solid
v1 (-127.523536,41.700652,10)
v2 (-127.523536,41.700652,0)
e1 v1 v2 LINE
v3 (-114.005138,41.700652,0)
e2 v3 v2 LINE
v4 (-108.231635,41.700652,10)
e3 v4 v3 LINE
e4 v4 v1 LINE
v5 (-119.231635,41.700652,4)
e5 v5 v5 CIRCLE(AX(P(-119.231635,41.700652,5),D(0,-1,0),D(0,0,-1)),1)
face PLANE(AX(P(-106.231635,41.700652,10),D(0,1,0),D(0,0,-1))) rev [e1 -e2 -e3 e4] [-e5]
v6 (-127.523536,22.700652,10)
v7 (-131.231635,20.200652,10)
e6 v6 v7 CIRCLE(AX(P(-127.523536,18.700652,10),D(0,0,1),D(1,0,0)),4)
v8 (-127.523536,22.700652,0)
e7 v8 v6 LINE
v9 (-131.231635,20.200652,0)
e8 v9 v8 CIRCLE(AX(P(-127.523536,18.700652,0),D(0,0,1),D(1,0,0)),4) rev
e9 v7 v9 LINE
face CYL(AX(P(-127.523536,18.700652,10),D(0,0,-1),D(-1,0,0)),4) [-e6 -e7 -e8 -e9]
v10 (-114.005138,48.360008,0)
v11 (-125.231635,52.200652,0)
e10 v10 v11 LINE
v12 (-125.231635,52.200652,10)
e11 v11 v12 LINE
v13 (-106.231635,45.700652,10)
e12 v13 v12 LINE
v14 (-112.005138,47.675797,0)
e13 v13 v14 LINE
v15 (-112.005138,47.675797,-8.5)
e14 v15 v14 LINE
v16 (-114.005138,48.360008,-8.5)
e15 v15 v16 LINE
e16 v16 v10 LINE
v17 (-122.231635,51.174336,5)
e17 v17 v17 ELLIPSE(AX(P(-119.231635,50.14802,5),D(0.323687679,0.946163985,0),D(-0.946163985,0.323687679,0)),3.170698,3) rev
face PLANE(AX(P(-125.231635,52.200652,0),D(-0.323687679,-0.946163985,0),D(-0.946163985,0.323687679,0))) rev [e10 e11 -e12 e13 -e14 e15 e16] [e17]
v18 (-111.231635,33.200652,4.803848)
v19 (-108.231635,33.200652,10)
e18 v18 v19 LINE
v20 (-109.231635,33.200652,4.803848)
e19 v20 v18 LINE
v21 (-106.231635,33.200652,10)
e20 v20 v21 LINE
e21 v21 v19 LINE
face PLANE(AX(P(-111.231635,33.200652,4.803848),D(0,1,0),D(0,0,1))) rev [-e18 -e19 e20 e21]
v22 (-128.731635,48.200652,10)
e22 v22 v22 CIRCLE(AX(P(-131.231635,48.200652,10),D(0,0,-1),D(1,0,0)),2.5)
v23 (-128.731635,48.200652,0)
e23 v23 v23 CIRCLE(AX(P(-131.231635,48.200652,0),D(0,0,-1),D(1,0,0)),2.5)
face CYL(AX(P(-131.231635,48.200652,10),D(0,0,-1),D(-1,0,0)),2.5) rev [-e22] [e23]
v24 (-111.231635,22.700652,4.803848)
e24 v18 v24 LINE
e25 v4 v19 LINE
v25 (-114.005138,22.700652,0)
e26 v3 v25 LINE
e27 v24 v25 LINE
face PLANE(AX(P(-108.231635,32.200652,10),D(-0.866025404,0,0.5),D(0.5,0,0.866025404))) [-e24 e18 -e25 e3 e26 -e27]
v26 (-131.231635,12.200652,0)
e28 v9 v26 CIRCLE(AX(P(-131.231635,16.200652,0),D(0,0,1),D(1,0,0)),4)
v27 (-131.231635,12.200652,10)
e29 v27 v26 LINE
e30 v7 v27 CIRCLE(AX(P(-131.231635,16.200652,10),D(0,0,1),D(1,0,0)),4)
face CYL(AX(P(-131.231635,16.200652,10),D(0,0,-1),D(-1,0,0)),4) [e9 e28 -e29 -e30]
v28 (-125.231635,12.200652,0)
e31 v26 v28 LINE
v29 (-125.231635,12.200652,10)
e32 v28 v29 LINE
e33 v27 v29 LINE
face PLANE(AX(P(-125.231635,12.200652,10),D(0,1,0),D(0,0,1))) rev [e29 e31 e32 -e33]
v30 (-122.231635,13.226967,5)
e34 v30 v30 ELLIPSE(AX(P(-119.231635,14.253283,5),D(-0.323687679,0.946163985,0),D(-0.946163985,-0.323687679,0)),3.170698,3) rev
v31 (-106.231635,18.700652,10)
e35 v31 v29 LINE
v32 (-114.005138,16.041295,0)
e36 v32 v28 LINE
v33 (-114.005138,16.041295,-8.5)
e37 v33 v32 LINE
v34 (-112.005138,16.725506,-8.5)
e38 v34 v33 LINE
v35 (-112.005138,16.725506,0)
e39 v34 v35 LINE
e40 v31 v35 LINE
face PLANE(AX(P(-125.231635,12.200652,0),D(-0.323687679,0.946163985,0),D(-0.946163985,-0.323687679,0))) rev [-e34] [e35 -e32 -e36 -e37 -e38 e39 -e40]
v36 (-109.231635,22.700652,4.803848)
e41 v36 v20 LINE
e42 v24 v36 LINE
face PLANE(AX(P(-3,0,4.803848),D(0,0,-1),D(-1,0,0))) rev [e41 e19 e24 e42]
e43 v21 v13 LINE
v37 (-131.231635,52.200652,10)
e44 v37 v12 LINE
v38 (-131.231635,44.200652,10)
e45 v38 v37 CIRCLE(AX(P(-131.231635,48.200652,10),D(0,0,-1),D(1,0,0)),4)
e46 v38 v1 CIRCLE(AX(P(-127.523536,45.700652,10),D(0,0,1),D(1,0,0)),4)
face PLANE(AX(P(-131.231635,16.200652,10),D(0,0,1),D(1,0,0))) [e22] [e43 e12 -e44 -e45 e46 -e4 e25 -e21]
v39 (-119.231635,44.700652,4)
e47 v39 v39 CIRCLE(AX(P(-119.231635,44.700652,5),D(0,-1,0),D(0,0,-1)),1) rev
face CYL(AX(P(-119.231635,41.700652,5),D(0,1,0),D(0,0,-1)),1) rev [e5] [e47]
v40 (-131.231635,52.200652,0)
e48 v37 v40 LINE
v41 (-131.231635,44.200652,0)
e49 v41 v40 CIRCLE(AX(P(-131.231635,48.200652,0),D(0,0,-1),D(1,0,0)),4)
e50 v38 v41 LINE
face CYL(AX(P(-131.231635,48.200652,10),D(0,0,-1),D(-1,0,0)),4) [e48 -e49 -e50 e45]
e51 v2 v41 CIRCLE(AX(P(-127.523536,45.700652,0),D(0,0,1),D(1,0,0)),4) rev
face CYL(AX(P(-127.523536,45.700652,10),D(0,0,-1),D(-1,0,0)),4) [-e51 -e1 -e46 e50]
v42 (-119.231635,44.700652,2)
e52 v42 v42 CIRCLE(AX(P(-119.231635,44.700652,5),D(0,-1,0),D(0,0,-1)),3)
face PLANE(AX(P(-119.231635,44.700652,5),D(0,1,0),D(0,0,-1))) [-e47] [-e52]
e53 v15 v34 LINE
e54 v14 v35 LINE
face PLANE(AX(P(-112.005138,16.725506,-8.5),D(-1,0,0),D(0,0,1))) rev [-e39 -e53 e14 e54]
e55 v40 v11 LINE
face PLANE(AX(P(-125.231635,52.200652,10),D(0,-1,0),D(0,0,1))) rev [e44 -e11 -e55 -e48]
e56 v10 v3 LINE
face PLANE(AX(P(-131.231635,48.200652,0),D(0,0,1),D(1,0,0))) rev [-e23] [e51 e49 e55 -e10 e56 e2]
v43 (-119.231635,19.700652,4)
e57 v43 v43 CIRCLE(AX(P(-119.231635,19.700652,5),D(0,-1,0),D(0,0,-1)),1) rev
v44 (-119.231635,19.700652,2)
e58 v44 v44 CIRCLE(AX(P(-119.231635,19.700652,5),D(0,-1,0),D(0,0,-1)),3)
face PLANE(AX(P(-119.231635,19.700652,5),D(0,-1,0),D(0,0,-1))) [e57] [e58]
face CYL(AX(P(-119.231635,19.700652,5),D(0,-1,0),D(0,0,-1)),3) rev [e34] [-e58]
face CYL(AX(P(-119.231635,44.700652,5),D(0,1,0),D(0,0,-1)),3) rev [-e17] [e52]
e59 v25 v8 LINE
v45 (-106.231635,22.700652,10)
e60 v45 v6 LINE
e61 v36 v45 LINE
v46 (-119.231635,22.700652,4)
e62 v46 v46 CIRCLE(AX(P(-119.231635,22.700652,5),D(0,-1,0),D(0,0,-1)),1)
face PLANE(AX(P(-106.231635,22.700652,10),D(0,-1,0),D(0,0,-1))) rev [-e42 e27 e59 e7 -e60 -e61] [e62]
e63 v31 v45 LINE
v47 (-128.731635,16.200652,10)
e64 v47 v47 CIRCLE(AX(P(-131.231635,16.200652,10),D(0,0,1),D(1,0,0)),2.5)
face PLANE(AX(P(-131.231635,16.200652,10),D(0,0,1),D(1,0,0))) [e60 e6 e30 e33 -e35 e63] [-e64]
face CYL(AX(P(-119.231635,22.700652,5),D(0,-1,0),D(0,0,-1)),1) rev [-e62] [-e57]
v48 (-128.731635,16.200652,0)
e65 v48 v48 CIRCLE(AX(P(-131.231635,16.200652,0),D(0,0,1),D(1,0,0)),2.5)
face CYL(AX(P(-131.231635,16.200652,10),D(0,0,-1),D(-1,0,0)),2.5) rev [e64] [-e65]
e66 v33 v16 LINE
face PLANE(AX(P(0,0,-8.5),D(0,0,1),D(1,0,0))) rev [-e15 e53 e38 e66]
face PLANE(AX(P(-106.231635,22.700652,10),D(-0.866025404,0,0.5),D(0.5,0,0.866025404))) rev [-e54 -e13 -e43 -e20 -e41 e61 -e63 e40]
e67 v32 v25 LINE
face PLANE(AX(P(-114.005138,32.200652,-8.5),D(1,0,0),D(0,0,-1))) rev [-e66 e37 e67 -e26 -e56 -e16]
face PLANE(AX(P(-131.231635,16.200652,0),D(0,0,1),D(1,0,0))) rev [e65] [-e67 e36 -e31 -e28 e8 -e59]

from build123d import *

# Parameters (mm, degrees)
CROQUIS1_R                = 2.5
SALIENTE_EXTRUIR1_DEPTH   = 10
CROQUIS2_R                = 1
CORTAR_EXTRUIR1_DEPTH     = 4
SALIENTE_EXTRUIR2_DEPTH   = 13.5
CROQUIS4_R                = 3
CORTAR_EXTRUIR2_DEPTH     = 1
SALIENTE_EXTRUIR3_START   = 6.5
CROQUIS6_R                = 3
SALIENTE_EXTRUIR3_DEPTH   = 6.5
CORTAR_EXTRUIR4_DEPTH     = 10
SALIENTE_EXTRUIR4_DEPTH   = 8.5
CORTAR_EXTRUIR5_START     = -5.196152423
CORTAR_EXTRUIR5_OUTLINE_W = 8
CORTAR_EXTRUIR5_OUTLINE_H = 10.5
CORTAR_EXTRUIR5_DEPTH     = 5.196152423
REDONDEO1_R               = 4


# Read off the part's stored shape, not the designer's step: Cortar-Extruir5
with BuildPart() as part:
    # Croquis1 → Saliente-Extruir1 (new body)
    with BuildSketch(Plane.XY):
        with BuildLine():
            Line((-106.231635218, 22.700651543), (-131.231635218, 22.700651543))
            Line((-131.231635218, 22.700651543), (-131.231635218, 20.200651543))
            ThreePointArc((-131.231635218, 20.200651543), (-135.231635218, 16.200651543), (-131.231635218, 12.200651543))
            Line((-131.231635218, 12.200651543), (-125.231635218, 12.200651543))
            Line((-125.231635218, 12.200651543), (-125.231635218, 18.700651543))
            Line((-125.231635218, 18.700651543), (-106.231635218, 18.700651543))
            Line((-106.231635218, 18.700651543), (-106.231635218, 22.700651543))
        make_face()
        with Locations((-131.231635218, 16.200651543)):
            Circle(CROQUIS1_R, mode=Mode.SUBTRACT)
    extrude(amount=SALIENTE_EXTRUIR1_DEPTH)

    # Croquis2 → Cortar-Extruir1 (cut)
    with BuildSketch(Plane.XZ.offset(-18.700651543)):
        with Locations(Location((-119.231635218, 5, 0), (0, 0, 270))):
            Circle(CROQUIS2_R)
        Polygon((-106.231635218, 0), (-106.231635218, 10), (-112.00513791, 0), align=None)
    extrude(amount=-CORTAR_EXTRUIR1_DEPTH, mode=Mode.SUBTRACT)

    # Croquis3 → Saliente-Extruir2 (add)
    with BuildSketch(Plane.XZ.offset(-18.700651543)):
        Polygon((-106.231635218, 10), (-108.231635218, 10), (-114.00513791, 0), (-112.00513791, 0), align=None)
    extrude(amount=-SALIENTE_EXTRUIR2_DEPTH)

    # Croquis4 → Cortar-Extruir2 (cut)
    with BuildSketch(Plane.XZ.offset(-18.700651543)):
        with Locations(Location((-119.231635218, 5, 0), (0, 0, 270))):
            Circle(CROQUIS4_R)
    extrude(amount=-CORTAR_EXTRUIR2_DEPTH, mode=Mode.SUBTRACT)

    # Croquis6 → Saliente-Extruir3 (add)
    with BuildSketch(Plane.XZ.offset(-18.700651543).offset(SALIENTE_EXTRUIR3_START)):
        Polygon((-125.231635218, 10), (-106.231635218, 10), (-112.00513791, 0), (-125.231635218, 0), align=None)
        with Locations(Location((-119.231635218, 5, 0), (0, 0, 270))):
            Circle(CROQUIS6_R, mode=Mode.SUBTRACT)
    extrude(amount=-SALIENTE_EXTRUIR3_DEPTH)

    # Croquis7 → Cortar-Extruir4 (cut)
    with BuildSketch(Plane.XY.offset(10)):
        Polygon((-106.231635218, 18.700651543), (-106.231635218, 12.200651543), (-125.231635218, 12.200651543), align=None)
    extrude(amount=-CORTAR_EXTRUIR4_DEPTH, mode=Mode.SUBTRACT)

    # Croquis8 → Saliente-Extruir4 (add)
    with BuildSketch(Plane(origin=(0, 0, 0), x_dir=(-1, 0, 0), z_dir=(0, 0, -1))):
        Polygon((112.00513791, 16.725505885), (112.00513791, 32.200651543), (114.00513791, 32.200651543), (114.00513791, 22.700651543), (114.00513791, 16.041295359), align=None)
    extrude(amount=SALIENTE_EXTRUIR4_DEPTH)

    # Simetría1: part across plane


with BuildPart() as part_1:
    add(part.part)
    add(part.part.mirror(Plane(origin=(0, 32.200651543, 0), x_dir=(0, 0, 1), z_dir=(0, -1, 0))))

    # Cortar-Extruir5 outline → Cortar-Extruir5 (cut)
    with BuildSketch(Plane.XY.offset(10).offset(CORTAR_EXTRUIR5_START)):
        with Locations((-109, 27.950651543)):
            Rectangle(CORTAR_EXTRUIR5_OUTLINE_W, CORTAR_EXTRUIR5_OUTLINE_H)
    extrude(amount=CORTAR_EXTRUIR5_DEPTH, mode=Mode.SUBTRACT)

    # Redondeo1
    # the kernel refuses this fillet: 4 mm, written as the material it takes off along each edge
    with BuildSketch(Plane(origin=(-131.231635218, 41.700651543, -9.270248109), x_dir=(1, 0, 0), z_dir=(0, 0, 1))) as redondeo1_piece_1:
        with BuildLine():
            CenterArc((3.708099244, 4), REDONDEO1_R, 202.024312837, 67.975687163)
            Line((0, 2.5), (-0.074161985, 2.47))
            ThreePointArc((-0.074161985, 2.47), (-0.08, 1.25), (-0.08, 0))
            Line((-0.08, 0), (0, -0.08))
            Line((0, -0.08), (3.708099244, -0.08))
            Line((3.708099244, -0.08), (3.708099244, 0))
        make_face()
    extrude(amount=28.540496218, mode=Mode.SUBTRACT)
    with BuildSketch(Plane(origin=(-131.231635218, 22.700651543, -9.270248109), x_dir=(0, -1, 0), z_dir=(0, 0, 1))) as redondeo1_piece_2:
        with BuildLine():
            CenterArc((4, 3.708099244), REDONDEO1_R, 180, 67.975687168)
            Line((0, 3.708099244), (-0.08, 3.708099244))
            Line((-0.08, 3.708099244), (-0.08, 0))
            Line((-0.08, 0), (0, -0.08))
            ThreePointArc((0, -0.08), (1.25, -0.08), (2.47, -0.074161985))
            Line((2.47, -0.074161985), (2.5, 0))
        make_face()
    extrude(amount=28.540496218, mode=Mode.SUBTRACT)


solid = part_1.part
